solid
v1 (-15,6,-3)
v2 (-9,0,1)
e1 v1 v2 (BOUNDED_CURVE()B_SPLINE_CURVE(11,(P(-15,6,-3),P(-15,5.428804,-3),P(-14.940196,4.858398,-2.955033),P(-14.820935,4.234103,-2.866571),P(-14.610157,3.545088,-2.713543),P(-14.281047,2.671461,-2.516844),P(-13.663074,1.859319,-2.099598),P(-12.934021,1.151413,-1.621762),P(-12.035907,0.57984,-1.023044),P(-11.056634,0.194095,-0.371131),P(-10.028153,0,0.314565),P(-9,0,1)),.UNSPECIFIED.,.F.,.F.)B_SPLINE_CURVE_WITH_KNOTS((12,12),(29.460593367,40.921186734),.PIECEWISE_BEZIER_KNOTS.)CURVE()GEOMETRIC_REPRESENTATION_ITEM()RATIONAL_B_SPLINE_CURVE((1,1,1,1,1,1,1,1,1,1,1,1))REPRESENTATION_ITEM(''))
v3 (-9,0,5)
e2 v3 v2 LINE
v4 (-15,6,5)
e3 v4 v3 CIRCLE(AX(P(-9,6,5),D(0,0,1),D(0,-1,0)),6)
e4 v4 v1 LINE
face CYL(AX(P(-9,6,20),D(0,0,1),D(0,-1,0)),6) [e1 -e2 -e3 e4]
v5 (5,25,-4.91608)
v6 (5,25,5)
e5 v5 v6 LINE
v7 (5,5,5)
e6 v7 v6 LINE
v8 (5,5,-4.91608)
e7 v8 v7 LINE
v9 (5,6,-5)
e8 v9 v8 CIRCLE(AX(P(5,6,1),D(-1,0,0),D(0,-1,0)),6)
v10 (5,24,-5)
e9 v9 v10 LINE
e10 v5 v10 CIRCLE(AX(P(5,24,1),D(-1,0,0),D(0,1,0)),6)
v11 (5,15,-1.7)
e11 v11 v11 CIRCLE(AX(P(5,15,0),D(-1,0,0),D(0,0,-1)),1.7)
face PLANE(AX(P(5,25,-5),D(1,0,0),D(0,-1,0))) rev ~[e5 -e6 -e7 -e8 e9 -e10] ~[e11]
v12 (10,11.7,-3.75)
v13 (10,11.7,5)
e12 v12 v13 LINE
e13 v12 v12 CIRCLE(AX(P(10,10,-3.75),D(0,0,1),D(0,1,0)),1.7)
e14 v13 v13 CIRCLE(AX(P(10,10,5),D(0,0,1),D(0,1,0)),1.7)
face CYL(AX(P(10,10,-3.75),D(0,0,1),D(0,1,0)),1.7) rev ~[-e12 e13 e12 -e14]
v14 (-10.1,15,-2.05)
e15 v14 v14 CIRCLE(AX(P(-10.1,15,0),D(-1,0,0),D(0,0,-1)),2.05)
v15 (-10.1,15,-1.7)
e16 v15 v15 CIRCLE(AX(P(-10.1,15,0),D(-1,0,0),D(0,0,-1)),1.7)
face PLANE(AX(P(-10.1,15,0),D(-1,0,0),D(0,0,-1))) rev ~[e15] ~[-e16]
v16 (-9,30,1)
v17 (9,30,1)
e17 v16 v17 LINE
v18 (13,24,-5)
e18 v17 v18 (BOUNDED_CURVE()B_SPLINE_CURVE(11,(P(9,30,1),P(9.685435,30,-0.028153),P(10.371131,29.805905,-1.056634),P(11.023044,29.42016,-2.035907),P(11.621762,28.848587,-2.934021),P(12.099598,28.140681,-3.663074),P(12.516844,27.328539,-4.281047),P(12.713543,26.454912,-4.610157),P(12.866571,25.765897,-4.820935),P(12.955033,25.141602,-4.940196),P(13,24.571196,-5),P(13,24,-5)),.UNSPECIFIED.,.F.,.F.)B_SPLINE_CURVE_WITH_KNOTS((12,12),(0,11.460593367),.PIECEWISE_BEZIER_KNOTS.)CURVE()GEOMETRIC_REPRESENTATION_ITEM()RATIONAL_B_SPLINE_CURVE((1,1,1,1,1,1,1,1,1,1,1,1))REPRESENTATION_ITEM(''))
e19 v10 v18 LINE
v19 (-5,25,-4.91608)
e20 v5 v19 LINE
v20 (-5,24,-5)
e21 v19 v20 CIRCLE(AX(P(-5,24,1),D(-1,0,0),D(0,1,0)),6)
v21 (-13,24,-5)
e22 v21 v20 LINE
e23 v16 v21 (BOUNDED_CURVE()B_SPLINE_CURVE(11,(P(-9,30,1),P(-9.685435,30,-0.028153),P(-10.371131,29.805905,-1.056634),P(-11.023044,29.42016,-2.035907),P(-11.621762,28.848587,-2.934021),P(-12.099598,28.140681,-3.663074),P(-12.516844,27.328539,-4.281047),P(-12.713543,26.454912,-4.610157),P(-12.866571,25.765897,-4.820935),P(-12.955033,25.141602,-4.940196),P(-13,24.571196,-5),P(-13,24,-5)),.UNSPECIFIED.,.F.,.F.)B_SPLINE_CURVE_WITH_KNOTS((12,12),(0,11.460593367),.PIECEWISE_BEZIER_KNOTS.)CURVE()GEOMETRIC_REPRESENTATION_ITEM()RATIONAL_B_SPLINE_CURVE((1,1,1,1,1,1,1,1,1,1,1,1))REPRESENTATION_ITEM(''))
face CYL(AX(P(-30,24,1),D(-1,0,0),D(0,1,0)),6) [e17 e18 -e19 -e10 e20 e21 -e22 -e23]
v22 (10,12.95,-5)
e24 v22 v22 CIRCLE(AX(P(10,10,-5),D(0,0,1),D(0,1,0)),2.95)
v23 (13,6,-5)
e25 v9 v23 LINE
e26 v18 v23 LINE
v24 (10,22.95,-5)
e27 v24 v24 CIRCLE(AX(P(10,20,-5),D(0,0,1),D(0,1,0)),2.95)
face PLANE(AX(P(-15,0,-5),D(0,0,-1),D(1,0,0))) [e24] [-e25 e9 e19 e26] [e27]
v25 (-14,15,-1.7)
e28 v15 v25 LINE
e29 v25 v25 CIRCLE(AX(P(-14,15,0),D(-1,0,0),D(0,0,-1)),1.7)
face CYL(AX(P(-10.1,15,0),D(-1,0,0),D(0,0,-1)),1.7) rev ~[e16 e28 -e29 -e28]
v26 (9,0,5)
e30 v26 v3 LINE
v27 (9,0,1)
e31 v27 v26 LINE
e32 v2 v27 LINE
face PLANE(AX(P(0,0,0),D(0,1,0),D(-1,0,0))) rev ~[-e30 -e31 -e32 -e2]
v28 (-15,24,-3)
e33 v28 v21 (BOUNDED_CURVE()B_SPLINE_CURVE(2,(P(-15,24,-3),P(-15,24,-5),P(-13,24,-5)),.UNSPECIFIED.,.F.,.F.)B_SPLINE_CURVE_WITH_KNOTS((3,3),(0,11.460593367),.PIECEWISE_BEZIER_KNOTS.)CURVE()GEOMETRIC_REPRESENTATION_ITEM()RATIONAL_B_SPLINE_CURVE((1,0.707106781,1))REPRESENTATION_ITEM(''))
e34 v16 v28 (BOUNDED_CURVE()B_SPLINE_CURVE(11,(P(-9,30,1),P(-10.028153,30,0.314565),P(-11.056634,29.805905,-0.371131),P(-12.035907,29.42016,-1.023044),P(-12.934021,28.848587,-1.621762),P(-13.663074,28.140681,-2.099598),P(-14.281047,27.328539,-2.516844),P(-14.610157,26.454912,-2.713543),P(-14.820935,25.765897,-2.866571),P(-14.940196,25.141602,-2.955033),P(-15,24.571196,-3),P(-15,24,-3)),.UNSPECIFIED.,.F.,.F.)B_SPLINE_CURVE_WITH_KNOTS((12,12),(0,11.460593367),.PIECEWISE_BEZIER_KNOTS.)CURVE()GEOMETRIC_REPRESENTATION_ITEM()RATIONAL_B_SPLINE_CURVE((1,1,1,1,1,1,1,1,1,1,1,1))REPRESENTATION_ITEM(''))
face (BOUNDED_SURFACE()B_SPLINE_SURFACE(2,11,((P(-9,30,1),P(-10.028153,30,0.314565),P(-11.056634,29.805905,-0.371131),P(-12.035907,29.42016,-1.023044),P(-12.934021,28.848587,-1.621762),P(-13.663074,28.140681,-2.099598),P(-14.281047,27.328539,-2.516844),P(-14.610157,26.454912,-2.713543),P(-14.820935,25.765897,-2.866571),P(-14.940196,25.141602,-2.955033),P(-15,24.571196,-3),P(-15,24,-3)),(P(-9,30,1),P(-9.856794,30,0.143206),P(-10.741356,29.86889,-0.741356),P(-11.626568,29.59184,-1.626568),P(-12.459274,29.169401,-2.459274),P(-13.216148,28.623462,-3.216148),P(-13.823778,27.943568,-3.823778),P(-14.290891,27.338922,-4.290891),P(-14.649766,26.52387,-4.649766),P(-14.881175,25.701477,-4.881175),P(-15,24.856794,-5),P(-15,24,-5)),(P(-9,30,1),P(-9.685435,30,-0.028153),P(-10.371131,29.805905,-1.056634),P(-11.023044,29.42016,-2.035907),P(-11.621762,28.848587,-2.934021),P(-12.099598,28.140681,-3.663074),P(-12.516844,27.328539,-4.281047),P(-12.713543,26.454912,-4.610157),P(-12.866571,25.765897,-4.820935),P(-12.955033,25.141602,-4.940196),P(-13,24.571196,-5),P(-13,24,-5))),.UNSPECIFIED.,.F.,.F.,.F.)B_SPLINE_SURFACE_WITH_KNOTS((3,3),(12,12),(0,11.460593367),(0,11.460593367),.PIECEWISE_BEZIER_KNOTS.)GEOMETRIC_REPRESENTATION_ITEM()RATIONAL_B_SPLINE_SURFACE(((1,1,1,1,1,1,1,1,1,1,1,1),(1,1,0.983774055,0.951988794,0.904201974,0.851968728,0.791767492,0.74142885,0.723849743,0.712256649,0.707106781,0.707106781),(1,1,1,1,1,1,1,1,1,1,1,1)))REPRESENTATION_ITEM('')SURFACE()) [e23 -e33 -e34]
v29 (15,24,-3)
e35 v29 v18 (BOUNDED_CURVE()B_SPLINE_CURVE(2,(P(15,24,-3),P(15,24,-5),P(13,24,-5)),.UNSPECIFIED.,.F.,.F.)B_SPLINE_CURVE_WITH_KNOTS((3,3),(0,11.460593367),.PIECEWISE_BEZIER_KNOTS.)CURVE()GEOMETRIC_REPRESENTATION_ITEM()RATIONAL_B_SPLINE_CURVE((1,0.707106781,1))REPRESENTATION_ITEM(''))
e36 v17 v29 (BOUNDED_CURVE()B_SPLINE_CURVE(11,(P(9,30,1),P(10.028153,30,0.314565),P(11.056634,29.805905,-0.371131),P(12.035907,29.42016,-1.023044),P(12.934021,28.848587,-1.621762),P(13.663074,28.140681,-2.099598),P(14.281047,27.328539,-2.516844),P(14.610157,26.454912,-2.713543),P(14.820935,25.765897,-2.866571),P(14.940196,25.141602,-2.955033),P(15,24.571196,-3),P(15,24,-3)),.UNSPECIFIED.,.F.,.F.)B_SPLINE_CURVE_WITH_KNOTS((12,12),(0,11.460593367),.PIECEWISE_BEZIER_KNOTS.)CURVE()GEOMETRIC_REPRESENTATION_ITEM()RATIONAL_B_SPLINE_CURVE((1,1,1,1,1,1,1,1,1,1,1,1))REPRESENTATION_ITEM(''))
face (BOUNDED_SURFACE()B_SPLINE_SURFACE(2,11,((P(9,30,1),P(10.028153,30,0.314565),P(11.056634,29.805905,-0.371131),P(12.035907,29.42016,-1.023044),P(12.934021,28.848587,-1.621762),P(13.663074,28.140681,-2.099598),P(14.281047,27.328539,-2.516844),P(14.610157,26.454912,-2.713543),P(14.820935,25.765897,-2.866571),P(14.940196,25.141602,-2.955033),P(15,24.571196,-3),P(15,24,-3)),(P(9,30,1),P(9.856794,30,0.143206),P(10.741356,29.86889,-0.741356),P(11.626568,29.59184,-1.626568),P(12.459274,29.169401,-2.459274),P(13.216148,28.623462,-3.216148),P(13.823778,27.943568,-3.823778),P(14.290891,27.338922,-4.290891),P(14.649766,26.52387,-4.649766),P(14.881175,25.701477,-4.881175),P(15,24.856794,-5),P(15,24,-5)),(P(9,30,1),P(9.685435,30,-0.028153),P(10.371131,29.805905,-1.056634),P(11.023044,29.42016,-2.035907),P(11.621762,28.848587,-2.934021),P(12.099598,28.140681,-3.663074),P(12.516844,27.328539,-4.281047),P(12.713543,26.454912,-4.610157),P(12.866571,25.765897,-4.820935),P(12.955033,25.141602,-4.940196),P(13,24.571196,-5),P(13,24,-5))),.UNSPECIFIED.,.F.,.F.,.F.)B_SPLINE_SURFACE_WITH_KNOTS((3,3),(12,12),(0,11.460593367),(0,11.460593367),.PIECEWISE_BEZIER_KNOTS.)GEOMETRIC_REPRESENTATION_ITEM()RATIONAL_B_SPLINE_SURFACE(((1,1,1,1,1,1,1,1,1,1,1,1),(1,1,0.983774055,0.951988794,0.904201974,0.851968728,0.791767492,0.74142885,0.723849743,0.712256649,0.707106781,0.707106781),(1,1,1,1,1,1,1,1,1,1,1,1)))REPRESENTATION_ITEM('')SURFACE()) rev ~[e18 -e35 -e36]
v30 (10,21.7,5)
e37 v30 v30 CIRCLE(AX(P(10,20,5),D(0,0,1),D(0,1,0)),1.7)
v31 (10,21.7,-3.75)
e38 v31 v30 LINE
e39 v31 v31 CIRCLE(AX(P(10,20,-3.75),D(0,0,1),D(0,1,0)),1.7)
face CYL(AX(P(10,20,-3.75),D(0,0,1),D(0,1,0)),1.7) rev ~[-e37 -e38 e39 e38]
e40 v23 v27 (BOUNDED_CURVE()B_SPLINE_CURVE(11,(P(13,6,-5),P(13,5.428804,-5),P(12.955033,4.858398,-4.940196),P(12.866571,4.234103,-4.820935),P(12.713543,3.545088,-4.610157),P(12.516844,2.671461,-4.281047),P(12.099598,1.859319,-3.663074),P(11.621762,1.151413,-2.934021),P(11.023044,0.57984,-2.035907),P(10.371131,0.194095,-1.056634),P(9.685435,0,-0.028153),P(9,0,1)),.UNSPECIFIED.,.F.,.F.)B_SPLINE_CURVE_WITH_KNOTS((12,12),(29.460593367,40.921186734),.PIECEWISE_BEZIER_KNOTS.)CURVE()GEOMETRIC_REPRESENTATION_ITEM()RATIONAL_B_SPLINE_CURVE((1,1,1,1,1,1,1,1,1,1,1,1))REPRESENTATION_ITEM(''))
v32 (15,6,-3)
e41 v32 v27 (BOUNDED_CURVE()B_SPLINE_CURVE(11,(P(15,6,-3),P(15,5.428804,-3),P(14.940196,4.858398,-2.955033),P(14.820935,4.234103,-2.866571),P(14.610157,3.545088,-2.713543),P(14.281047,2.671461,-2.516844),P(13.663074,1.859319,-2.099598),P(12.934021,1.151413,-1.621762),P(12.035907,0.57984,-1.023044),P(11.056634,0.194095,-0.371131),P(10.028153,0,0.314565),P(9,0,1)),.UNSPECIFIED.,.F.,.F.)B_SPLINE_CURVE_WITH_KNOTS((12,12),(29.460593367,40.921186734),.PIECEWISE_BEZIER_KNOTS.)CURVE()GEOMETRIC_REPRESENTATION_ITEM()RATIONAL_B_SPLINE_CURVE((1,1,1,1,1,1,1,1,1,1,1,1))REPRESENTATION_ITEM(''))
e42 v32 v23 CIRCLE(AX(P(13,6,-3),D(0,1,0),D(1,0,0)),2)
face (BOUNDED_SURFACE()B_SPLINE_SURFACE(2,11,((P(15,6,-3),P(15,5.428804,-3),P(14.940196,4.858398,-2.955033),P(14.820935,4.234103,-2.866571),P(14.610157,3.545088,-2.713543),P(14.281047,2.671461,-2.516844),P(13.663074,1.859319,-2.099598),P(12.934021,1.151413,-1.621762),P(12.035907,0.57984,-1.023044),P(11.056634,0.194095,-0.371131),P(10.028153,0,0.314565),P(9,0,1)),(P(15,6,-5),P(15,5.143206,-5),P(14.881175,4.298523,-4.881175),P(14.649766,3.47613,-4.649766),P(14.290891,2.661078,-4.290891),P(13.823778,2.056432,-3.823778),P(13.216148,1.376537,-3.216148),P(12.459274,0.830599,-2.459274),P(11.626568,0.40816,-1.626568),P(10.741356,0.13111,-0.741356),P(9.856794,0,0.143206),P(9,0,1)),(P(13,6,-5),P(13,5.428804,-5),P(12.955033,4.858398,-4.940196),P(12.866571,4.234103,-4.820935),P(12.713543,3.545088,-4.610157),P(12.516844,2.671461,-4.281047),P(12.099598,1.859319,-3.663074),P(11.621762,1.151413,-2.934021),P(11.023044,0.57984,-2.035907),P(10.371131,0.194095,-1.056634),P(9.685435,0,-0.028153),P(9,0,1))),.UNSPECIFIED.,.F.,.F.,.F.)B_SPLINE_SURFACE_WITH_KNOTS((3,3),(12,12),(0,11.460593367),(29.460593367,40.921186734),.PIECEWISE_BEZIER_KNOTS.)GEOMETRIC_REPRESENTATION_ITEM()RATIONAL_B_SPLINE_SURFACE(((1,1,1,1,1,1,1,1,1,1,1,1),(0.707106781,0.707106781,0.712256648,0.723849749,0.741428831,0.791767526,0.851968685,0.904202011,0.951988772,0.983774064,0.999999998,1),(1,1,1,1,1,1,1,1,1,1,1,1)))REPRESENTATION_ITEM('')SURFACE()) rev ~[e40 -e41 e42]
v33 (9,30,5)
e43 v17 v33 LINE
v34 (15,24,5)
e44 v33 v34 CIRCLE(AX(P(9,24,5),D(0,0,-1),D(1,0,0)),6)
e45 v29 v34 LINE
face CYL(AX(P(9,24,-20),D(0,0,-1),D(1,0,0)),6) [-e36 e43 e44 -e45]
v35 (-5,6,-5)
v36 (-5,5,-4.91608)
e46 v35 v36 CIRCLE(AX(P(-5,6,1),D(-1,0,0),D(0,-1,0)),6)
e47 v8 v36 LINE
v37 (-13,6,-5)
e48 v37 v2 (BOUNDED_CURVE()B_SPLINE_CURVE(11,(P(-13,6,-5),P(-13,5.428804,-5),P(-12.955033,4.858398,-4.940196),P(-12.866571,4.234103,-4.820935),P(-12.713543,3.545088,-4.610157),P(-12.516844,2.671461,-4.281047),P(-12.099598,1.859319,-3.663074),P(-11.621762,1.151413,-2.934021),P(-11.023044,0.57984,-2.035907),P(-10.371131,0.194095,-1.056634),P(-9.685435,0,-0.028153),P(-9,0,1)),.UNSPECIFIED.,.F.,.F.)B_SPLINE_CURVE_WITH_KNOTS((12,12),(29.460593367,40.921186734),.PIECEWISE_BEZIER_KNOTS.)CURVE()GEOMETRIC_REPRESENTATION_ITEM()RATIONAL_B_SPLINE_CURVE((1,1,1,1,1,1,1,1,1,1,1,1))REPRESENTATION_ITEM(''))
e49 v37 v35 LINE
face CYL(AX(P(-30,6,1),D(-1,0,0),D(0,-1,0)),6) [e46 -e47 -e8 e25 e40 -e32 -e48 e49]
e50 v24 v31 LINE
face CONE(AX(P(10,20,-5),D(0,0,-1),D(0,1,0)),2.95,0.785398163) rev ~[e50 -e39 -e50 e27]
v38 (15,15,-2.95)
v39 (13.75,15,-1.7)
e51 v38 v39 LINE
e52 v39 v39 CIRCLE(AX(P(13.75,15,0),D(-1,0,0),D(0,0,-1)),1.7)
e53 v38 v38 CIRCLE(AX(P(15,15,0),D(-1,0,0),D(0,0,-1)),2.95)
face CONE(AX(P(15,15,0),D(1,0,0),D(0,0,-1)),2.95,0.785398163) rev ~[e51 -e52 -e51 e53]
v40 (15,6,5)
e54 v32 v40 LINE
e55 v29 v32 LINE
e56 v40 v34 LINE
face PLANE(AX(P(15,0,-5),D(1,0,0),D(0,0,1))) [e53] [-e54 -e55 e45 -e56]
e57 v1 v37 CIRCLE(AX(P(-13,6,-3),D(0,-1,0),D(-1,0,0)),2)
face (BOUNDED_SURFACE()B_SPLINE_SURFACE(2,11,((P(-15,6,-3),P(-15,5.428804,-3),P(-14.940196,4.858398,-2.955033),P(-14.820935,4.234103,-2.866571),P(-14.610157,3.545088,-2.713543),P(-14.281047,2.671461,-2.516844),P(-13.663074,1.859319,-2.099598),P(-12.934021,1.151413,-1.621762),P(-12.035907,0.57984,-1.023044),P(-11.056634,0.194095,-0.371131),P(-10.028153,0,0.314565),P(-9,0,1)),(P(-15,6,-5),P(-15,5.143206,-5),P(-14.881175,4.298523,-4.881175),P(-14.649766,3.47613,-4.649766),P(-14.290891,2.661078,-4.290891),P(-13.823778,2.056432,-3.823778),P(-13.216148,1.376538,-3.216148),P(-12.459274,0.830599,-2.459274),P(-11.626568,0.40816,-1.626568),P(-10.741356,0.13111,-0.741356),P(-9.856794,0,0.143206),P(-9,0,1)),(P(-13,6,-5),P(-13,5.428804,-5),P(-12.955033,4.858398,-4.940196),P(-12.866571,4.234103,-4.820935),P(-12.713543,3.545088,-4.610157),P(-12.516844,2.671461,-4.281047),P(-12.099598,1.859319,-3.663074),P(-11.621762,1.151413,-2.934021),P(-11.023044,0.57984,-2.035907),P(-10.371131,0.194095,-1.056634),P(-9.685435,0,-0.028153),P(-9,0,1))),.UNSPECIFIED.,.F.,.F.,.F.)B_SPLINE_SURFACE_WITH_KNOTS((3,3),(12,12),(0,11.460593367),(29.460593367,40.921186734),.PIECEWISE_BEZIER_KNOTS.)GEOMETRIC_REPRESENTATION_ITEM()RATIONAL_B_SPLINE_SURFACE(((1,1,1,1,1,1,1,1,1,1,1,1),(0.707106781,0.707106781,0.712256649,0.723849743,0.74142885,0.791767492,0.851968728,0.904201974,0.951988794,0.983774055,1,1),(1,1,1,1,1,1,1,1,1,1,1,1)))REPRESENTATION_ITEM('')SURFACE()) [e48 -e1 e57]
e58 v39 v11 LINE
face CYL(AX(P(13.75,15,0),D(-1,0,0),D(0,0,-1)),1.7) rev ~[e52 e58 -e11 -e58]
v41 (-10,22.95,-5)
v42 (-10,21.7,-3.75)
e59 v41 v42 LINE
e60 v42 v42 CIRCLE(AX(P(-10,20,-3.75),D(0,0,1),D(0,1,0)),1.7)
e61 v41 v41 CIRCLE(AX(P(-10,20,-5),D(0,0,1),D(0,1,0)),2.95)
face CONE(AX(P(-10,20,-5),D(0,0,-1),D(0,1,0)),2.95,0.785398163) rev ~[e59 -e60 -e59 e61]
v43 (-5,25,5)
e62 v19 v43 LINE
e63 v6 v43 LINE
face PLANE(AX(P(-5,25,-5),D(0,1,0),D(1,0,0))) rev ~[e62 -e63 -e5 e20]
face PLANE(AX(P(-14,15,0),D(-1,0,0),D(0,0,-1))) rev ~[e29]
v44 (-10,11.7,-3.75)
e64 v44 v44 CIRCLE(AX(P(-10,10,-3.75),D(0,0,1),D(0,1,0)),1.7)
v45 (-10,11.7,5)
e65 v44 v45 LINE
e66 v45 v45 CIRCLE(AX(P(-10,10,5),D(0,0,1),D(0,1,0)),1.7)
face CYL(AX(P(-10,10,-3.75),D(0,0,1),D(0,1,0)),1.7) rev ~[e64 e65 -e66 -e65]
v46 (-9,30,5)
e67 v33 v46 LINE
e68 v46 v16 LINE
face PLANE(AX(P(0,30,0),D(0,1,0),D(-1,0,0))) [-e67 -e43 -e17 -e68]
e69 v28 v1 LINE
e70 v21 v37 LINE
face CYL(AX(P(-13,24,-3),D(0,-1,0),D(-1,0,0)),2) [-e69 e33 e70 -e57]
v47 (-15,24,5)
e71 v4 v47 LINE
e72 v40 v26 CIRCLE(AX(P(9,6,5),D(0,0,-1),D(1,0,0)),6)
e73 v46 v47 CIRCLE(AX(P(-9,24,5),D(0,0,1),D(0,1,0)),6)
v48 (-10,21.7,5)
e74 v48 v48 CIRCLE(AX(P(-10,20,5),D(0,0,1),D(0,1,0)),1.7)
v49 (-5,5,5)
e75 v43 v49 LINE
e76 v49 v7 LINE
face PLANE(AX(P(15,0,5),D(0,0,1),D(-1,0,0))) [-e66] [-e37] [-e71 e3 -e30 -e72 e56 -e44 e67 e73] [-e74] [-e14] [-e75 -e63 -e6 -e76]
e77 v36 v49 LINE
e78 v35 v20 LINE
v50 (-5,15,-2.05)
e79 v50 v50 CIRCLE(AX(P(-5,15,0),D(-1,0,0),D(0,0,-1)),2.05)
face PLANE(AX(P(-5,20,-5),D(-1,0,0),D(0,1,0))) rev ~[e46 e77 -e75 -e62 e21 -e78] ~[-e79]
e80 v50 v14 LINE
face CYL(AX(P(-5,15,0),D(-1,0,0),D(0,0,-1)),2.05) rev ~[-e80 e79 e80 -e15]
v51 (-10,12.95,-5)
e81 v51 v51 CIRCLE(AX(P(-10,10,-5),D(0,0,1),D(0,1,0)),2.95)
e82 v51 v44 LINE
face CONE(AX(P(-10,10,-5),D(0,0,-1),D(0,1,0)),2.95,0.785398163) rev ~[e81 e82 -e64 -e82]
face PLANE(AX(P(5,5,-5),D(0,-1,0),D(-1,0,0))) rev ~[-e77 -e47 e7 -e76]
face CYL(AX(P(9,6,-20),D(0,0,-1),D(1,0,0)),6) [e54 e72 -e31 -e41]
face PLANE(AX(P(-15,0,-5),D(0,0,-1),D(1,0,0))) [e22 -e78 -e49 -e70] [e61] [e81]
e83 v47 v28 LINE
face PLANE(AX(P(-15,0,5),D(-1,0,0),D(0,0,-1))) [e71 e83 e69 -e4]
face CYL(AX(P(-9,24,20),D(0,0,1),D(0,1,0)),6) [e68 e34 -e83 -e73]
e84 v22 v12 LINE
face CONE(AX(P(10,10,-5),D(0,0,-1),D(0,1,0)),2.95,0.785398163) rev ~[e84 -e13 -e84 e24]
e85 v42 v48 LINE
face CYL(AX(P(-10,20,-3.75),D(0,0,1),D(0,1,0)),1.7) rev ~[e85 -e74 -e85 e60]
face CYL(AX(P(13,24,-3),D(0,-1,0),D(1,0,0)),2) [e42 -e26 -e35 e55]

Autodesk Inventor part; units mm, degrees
ref_plane "YZ Plane" through (0, 0, 0) normal (1, 0, 0) x (0, 1, 0)
ref_plane "XZ Plane" through (0, 0, 0) normal (0, 1, 0) x (-1, 0, 0)
ref_plane "XY Plane" through (0, 0, 0) normal (0, 0, 1) x (1, 0, 0)
sketch "Sketch1" plane through (0, 0, 0) normal (0, 1, 0) x (-1, 0, 0)
  line L0 (-15, 5) -> (15, 5)
  line L1 (15, 5) -> (15, -5)
  line L2 (15, -5) -> (-15, -5)
  line L3 (-15, -5) -> (-15, 5)
  line L4 (-15, 5) -> (15, -5) construction
  line L5 (15, 5) -> (-15, -5) construction
  point P0 (0, 0)
  dimension "d0" = 30
  dimension "d1" = 10
extrude "Extrusion1" add sketch "Sketch1" along normal blind 30
sketch "Sketch2" plane through (15, 0, -5) normal (0, 0, -1) x (-1, 0, 0)
  line L0 (0, 0) -> (0, 30) projected
  line L1 (0, 30) -> (30, 30) projected
  line L2 (0, 0) -> (30, 30)
  line L3 (10, 5) -> (20, 5)
  line L4 (20, 5) -> (20, 25)
  line L5 (20, 25) -> (10, 25)
  line L6 (10, 25) -> (10, 5)
  line L7 (10, 5) -> (20, 25) construction
  line L8 (20, 5) -> (10, 25) construction
  point P0 (15, 0)
  point P1 (15, 15)
  dimension "d4" = 10
  dimension "d5" = 20
extrude "Extrusion2" cut sketch "Sketch2" against normal through all contours L6 L5 L4 L2 | L2 L4 L3 L6
sketch "Sketch3" plane through (15, 0, 5) normal (1, 0, 0) x (0, 0, -1)
  line L0 (10, 0) -> (0, 0) projected
  line L1 (0, 30) -> (10, 30) projected
  line L2 (0, 0) -> (10, 30)
  line L3 (5, 15) -> (17.6725, 15)
  point P0 (5, 0)
hole "Hole1" at (15, 15, 0) direction (-1, 0, 0) diameter 3.4 depth 10 countersink diameter 5.9 countersink angle 90
sketch "Sketch4" plane through (-5, 5, -5) normal (1, 0, 0) x (0, 0, -1)
  line L0 (-10, 0) -> (-10, 20) projected
  line L1 (0, 20) -> (-10, 20) projected
  line L2 (-10, 0) -> (0, 20)
  line L3 (-5, 10) -> (5, 10)
  point P0 (-5, -5)
  dimension "d15" = 10
hole "Hole2" at (-5, 15, 0) direction (-1, 0, 0) diameter 3.4 depth 9 counterbore diameter 4.1 counterbore depth 5.1
sketch "Sketch5" plane through (15, 0, -5) normal (0, 0, -1) x (-1, 0, 0)
  line L0 (30, 0) -> (0, 0) projected
  line L1 (30, 0) -> (30, 30) projected
  line L2 (0, 0) -> (30, 30)
  line L3 (5, 10) -> (25, 10)
  line L4 (25, 10) -> (25, 20)
  line L5 (25, 20) -> (5, 20)
  line L6 (5, 20) -> (5, 10)
  line L7 (5, 10) -> (25, 20) construction
  line L8 (25, 10) -> (5, 20) construction
  point P0 (15, 0)
  point P1 (15, 15)
  dimension "d23" = 20
  dimension "d24" = 10
hole "Hole3" at (10, 20, -5) at (10, 10, -5) at (-10, 10, -5) at (-10, 20, -5) direction (0, 0, 1) diameter 3.4 end through all countersink diameter 5.9 countersink angle 90
fillet "Fillet1" radius 6 6 edges at (15, 30, 0) (-15, 30, 0) (15, 0, 0) (-15, 0, 0) (0, 30, -5) (0, 0, -5)
fillet "Fillet2" radius 2 6 edges at (13.2426, 28.2426, -3.2426) (13.2426, 1.7574, -3.2426) (15, 15, -5) (-13.2426, 28.2426, -3.2426) (-13.2426, 1.7574, -3.2426) (-15, 15, -5)
properties part number "Tensor"
